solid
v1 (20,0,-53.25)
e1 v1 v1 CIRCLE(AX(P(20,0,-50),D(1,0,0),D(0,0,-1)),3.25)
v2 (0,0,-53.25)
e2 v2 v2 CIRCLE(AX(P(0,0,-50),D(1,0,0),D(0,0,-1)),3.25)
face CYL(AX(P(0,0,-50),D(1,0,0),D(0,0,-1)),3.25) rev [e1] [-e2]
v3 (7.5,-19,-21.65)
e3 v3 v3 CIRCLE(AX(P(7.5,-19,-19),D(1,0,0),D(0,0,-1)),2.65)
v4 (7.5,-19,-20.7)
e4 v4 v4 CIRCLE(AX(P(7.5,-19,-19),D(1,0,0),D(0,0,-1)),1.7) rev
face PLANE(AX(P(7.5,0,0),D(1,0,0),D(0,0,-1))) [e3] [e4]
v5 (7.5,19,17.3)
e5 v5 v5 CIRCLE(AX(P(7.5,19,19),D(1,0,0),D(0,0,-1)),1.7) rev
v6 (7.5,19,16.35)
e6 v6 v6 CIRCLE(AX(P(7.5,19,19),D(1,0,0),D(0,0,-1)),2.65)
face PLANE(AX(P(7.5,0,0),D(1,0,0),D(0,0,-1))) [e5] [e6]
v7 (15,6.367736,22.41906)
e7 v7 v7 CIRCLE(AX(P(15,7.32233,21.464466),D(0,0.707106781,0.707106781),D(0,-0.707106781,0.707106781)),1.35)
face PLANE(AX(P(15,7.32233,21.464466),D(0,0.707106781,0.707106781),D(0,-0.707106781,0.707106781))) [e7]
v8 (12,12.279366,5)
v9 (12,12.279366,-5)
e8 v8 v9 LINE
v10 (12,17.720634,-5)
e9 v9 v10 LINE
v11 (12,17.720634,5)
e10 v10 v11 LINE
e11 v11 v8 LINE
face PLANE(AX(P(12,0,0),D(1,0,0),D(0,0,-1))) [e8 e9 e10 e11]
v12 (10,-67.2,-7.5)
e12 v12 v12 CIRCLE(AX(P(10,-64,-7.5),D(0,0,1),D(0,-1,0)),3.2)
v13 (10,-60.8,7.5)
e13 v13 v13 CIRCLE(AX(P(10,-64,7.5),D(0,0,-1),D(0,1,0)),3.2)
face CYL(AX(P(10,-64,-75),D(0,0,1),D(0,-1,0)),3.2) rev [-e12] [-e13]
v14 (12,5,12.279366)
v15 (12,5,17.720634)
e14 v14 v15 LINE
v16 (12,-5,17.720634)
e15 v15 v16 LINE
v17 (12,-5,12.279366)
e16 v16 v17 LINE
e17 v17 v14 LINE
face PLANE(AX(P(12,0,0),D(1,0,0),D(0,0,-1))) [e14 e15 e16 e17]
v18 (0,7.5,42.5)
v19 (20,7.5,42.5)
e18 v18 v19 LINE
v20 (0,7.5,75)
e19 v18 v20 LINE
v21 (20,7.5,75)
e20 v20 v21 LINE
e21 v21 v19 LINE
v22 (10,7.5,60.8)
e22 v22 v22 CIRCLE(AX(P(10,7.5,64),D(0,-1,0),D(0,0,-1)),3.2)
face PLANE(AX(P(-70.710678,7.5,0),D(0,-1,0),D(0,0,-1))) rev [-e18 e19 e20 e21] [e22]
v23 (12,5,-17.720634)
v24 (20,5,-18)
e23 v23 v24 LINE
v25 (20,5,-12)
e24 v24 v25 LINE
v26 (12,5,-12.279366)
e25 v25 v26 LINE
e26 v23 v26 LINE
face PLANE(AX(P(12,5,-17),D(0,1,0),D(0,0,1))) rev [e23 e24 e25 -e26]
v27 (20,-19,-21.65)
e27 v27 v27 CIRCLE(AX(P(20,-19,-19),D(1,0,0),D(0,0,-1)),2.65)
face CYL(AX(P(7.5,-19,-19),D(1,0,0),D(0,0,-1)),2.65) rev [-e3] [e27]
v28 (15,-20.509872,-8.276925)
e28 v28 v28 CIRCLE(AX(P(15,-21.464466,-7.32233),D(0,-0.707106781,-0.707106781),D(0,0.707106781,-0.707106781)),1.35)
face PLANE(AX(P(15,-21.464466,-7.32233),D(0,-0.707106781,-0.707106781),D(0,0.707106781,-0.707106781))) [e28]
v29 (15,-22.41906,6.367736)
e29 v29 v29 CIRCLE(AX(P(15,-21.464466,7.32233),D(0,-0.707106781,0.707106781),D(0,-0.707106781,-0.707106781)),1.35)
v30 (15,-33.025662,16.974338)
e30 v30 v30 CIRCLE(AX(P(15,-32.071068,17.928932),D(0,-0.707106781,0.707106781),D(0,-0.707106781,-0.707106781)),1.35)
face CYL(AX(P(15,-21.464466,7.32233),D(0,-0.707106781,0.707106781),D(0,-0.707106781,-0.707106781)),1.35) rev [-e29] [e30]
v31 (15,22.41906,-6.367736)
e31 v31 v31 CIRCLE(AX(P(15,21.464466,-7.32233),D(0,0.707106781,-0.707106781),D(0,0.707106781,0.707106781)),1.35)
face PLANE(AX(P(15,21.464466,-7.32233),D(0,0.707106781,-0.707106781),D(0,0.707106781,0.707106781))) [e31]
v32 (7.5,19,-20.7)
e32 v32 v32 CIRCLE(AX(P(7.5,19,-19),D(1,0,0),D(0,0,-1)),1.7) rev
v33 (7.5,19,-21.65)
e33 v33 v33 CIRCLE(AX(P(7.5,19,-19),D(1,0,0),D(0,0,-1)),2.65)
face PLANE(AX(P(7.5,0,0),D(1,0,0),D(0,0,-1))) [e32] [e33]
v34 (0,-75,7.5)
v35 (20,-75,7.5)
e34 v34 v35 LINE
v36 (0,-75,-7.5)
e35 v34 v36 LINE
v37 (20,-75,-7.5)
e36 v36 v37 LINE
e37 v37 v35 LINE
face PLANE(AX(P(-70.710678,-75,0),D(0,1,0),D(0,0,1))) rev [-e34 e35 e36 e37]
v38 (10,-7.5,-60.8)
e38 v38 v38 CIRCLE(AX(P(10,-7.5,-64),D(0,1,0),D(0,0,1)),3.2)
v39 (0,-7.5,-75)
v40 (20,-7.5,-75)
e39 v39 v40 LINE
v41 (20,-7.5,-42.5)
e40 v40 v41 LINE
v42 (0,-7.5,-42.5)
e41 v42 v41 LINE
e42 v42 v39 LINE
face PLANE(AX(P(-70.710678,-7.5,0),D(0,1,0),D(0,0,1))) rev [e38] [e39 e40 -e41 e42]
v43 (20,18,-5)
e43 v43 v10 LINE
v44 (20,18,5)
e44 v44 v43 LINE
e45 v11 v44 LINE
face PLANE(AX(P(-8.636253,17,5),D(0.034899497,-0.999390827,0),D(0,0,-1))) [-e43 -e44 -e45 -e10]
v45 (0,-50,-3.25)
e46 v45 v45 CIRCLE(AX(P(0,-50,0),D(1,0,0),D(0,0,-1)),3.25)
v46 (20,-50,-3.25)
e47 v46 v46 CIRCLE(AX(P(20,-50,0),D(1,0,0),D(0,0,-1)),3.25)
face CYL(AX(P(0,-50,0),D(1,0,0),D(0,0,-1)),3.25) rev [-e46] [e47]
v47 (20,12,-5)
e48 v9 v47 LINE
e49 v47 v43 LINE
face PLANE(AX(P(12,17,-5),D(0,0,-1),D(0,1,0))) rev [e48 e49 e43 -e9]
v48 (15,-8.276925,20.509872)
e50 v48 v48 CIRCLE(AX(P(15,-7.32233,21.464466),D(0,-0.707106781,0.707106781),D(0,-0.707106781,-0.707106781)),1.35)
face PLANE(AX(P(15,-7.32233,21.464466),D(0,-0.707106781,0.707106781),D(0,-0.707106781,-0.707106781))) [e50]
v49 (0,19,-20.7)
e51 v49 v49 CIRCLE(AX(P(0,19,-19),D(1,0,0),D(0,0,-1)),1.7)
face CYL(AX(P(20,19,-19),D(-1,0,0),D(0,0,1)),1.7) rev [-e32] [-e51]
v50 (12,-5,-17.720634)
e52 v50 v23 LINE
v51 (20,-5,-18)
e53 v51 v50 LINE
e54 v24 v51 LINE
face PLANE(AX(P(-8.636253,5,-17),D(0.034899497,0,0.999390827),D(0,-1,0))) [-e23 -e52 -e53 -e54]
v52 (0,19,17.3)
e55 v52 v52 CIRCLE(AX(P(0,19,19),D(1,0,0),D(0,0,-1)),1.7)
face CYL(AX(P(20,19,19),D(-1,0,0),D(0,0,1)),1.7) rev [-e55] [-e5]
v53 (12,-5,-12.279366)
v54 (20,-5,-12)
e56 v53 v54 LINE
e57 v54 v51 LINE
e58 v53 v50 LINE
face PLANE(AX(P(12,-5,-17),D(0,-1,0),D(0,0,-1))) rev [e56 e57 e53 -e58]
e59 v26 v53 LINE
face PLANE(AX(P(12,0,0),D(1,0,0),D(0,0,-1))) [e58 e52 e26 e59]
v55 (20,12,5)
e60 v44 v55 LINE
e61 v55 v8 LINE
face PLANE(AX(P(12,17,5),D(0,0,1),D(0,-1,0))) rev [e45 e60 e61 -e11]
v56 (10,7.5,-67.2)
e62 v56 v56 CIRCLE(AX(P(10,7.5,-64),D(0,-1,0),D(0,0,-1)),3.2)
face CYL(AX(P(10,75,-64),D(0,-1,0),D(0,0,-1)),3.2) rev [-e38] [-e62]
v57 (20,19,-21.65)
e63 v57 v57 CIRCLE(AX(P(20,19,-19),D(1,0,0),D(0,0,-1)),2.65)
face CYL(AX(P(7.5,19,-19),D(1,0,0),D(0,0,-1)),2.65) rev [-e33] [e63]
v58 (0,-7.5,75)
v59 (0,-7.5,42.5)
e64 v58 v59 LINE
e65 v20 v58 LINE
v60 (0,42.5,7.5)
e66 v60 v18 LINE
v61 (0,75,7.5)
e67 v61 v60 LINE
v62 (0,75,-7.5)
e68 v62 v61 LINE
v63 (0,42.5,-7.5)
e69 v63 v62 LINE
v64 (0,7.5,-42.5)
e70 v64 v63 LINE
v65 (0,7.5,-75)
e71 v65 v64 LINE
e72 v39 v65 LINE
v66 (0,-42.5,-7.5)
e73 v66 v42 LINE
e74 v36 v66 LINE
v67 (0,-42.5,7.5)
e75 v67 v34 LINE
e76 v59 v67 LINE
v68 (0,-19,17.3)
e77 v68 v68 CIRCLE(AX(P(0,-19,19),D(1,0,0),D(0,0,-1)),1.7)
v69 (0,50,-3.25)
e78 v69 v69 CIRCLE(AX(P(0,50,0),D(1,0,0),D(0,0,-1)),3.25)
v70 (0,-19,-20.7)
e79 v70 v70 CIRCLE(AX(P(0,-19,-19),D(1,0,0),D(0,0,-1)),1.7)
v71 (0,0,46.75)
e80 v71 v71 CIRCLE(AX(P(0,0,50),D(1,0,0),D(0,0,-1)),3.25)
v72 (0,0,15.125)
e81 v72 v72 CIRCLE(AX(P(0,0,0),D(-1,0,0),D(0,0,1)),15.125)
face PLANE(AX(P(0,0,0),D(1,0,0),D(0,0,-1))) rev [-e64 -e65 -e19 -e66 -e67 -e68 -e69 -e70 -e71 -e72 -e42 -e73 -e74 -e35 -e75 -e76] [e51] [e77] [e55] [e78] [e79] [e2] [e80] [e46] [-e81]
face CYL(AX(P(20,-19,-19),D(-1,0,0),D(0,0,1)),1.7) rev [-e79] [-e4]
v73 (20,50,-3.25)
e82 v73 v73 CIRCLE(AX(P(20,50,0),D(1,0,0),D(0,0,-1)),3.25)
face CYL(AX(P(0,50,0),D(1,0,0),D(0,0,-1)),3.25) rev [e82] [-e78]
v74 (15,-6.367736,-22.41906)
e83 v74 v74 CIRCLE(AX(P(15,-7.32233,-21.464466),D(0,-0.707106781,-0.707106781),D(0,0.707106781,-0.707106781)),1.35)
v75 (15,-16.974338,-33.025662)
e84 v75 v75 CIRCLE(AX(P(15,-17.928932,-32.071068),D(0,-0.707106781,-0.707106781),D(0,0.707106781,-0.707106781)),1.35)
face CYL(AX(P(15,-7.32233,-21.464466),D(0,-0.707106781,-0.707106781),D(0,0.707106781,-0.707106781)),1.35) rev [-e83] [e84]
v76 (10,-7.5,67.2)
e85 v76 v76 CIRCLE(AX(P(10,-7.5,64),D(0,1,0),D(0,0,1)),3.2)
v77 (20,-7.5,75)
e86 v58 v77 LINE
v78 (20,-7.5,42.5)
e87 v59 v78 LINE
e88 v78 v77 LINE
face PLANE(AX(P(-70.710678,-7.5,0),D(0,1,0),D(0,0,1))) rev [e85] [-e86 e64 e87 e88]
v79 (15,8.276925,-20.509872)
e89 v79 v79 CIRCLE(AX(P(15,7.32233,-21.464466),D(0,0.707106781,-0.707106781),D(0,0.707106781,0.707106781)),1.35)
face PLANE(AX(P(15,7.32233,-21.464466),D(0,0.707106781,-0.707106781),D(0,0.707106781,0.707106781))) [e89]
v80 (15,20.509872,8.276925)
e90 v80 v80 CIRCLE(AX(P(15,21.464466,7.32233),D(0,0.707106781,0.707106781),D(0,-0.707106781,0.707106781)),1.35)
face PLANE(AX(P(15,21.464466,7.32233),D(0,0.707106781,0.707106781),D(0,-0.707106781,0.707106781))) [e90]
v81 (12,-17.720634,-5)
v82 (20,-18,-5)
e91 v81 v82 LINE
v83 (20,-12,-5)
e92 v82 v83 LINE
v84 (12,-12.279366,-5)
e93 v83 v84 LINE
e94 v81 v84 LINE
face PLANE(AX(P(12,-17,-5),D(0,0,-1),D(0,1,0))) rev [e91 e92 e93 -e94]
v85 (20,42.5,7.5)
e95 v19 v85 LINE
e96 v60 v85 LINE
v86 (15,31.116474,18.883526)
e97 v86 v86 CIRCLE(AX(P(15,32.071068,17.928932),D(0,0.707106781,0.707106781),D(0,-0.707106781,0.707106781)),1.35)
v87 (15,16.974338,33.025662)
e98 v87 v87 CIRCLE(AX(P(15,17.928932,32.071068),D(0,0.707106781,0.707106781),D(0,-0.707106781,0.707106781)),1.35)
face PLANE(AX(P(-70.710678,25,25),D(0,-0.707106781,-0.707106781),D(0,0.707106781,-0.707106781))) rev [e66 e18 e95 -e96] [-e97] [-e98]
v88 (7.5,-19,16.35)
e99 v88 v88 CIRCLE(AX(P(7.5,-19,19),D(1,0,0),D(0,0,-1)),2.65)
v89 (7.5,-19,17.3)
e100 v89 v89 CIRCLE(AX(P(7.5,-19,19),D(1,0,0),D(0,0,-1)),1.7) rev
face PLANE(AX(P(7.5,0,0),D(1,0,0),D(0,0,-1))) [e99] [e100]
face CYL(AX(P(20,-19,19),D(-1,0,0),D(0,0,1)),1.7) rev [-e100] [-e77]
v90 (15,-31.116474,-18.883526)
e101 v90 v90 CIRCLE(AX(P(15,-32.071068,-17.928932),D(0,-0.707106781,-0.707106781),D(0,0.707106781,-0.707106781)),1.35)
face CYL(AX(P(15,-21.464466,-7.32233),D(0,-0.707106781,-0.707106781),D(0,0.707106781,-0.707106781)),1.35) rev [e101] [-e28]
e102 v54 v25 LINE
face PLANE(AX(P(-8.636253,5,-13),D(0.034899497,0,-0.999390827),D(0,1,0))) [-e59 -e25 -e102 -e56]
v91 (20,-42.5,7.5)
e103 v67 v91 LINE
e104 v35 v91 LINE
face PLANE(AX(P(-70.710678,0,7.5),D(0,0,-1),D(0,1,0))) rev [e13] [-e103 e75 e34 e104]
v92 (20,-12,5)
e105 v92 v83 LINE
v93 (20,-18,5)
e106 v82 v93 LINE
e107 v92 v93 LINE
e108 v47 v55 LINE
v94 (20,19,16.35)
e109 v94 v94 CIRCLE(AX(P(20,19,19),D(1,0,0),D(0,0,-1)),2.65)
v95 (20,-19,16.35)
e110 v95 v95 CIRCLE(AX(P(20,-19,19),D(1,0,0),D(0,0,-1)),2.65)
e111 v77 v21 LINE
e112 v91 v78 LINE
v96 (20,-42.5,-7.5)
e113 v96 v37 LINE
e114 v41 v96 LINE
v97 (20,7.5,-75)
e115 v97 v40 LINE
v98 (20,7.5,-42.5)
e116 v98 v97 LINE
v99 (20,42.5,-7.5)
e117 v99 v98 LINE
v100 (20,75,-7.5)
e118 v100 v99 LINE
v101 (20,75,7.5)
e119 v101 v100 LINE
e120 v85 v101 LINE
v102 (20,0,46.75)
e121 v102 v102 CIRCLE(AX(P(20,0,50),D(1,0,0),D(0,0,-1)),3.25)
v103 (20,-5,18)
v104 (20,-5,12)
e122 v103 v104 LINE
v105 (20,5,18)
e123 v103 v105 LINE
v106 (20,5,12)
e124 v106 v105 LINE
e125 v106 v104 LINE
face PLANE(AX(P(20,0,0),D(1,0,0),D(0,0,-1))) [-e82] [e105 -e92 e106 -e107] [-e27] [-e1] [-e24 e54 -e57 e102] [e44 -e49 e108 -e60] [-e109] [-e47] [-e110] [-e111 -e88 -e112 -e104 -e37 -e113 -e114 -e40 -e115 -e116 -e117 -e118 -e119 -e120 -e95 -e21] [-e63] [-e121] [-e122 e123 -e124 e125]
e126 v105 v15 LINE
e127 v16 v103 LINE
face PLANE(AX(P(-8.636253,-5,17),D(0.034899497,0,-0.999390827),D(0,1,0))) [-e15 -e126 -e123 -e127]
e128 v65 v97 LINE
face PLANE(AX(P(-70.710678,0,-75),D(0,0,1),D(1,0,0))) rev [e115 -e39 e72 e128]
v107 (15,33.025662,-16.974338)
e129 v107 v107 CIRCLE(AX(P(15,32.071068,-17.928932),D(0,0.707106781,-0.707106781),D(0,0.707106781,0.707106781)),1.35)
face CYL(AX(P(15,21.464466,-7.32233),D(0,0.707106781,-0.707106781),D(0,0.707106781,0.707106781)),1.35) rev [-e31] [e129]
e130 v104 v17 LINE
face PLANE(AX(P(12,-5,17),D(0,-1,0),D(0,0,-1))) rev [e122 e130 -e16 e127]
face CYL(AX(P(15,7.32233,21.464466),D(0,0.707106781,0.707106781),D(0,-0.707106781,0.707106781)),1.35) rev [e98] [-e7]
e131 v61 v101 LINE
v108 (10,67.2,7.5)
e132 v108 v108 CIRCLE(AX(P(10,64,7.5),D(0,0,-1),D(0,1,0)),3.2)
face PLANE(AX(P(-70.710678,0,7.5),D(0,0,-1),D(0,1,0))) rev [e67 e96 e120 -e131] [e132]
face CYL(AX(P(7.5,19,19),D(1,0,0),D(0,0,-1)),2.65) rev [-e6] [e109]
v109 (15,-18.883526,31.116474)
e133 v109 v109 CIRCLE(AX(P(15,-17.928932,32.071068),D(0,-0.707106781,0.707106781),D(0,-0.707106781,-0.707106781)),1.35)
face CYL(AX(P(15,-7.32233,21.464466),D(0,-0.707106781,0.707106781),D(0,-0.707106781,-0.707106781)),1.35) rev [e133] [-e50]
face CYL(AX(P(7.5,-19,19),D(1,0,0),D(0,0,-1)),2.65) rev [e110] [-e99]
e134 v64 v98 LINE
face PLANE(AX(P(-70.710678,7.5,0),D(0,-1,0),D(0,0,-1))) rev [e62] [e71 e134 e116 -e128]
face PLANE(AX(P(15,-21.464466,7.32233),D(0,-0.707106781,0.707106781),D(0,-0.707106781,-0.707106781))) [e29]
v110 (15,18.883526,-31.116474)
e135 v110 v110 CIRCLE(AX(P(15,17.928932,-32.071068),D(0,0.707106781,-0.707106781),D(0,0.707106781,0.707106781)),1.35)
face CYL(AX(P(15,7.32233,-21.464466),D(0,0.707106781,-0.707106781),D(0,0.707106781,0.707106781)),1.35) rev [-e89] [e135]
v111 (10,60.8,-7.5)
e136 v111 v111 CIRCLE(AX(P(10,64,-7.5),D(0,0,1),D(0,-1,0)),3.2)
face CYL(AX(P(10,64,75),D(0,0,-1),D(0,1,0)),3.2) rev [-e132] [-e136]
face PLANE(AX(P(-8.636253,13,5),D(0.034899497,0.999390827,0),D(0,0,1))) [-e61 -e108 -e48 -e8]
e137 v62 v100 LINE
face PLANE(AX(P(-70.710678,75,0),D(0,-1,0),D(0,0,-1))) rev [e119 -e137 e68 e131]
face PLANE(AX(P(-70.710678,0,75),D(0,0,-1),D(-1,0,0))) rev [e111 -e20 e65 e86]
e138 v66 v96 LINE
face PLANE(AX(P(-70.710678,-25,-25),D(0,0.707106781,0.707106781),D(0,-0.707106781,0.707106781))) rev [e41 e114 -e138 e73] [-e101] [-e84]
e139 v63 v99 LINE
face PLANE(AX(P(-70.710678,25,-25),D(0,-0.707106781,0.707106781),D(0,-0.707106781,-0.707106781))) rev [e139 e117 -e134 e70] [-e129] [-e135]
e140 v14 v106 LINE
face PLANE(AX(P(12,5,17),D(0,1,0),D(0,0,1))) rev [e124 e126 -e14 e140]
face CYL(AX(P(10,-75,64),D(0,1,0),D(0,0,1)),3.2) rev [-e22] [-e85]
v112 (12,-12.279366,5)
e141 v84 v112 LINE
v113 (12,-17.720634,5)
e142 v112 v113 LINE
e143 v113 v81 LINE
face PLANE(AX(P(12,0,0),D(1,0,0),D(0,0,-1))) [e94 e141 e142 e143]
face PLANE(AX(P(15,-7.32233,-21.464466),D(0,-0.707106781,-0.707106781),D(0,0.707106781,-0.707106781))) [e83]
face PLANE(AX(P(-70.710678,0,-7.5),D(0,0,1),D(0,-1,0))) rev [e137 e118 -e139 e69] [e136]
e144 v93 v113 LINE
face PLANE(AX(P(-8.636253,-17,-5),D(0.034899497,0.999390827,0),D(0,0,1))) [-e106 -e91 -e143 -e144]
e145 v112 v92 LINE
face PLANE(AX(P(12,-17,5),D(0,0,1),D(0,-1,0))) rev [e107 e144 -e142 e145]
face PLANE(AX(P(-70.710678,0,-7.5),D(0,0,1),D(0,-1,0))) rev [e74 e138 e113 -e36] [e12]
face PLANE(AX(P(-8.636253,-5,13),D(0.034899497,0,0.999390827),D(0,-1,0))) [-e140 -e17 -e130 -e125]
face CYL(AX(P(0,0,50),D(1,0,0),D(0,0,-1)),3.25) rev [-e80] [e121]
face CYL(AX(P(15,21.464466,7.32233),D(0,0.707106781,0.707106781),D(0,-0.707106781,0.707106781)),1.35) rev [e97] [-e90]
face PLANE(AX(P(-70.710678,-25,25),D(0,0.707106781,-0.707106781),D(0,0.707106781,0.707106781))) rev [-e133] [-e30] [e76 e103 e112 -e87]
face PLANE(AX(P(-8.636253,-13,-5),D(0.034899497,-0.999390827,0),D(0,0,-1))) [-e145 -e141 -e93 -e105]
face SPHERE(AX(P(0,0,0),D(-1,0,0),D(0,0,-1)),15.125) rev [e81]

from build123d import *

# Parameters (mm, degrees)
SKETCH1_W               = 50
SKETCH1_H               = 50
SKETCH1_R               = 1.7
BOSS_EXTRUDE1_DEPTH     = 20
CUT_EXTRUDE1_START      = -12.5
SKETCH2_R               = 2.65
SKETCH2_R_2             = 1.7
CUT_EXTRUDE1_DEPTH      = 12.5
BOSS_EXTRUDE3_DEPTH     = 20
SKETCH5_W               = 4
SKETCH5_H               = 10
SKETCH5_W_2             = 10
SKETCH5_H_2             = 4
CUT_EXTRUDE2_DEPTH      = 8
CHAMFER1_START          = -5
CHAMFER1_DEPTH          = 10
CHAMFER1_START_2        = -17.720633844
CHAMFER1_2_OUTLINE_W    = 8
CHAMFER1_2_OUTLINE_H    = 10
CHAMFER1_2_DEPTH        = 5.441267688
CHAMFER1_START_3        = 12.279366156
CHAMFER1_3_OUTLINE_W    = 8
CHAMFER1_3_OUTLINE_H    = 10
CHAMFER1_3_DEPTH        = 5.441267688
CHAMFER1_4_DEPTH        = 10
CUT_EXTRUDE4_DEPTH      = 108.935165725
CUT_EXTRUDE4_DEPTH_BACK = 108.935165725
SKETCH7_R               = 3.25
SKETCH8_R               = 3.2
CUT_EXTRUDE5_DEPTH      = 114.275107592
CIRPATTERN1_COUNT       = 4
SKETCH9_R               = 1.35
CUT_EXTRUDE6_DEPTH      = 15
CIRPATTERN2_COUNT       = 4


with BuildPart() as part:
    # Sketch1 → Boss-Extrude1 (new body)
    with BuildSketch(Plane(origin=(0, 0, 0), x_dir=(0, 0, -1), z_dir=(1, 0, 0))):
        Rectangle(SKETCH1_W, SKETCH1_H)
        with Locations((-19, 19)):
            Circle(SKETCH1_R, mode=Mode.SUBTRACT)
        with Locations((19, 19)):
            Circle(SKETCH1_R, mode=Mode.SUBTRACT)
        with Locations((19, -19)):
            Circle(SKETCH1_R, mode=Mode.SUBTRACT)
        with Locations((-19, -19)):
            Circle(SKETCH1_R, mode=Mode.SUBTRACT)
    extrude(amount=BOSS_EXTRUDE1_DEPTH)

    # Sketch2 → Cut-Extrude1 (cut)
    # profile 1 of 4: a face of its own
    with BuildSketch(Plane(origin=(20, 0, 0), x_dir=(0, 0, -1), z_dir=(1, 0, 0)).offset(CUT_EXTRUDE1_START)):
        with Locations((-19, 19)):
            Circle(SKETCH2_R)
        with Locations((-19, 19)):
            Circle(SKETCH2_R_2, mode=Mode.SUBTRACT)
    # profile 2 of 4: a face of its own
    with BuildSketch(Plane(origin=(20, 0, 0), x_dir=(0, 0, -1), z_dir=(1, 0, 0)).offset(CUT_EXTRUDE1_START)):
        with Locations((19, 19)):
            Circle(SKETCH2_R)
        with Locations((19, 19)):
            Circle(SKETCH2_R_2, mode=Mode.SUBTRACT)
    # profile 3 of 4: a face of its own
    with BuildSketch(Plane(origin=(20, 0, 0), x_dir=(0, 0, -1), z_dir=(1, 0, 0)).offset(CUT_EXTRUDE1_START)):
        with Locations((19, -19)):
            Circle(SKETCH2_R)
        with Locations((19, -19)):
            Circle(SKETCH2_R_2, mode=Mode.SUBTRACT)
    # profile 4 of 4: a face of its own
    with BuildSketch(Plane(origin=(20, 0, 0), x_dir=(0, 0, -1), z_dir=(1, 0, 0)).offset(CUT_EXTRUDE1_START)):
        with Locations((-19, -19)):
            Circle(SKETCH2_R)
        with Locations((-19, -19)):
            Circle(SKETCH2_R_2, mode=Mode.SUBTRACT)
    extrude(amount=CUT_EXTRUDE1_DEPTH, mode=Mode.SUBTRACT)

    # Sketch3 → Cut-Revolve1 (revolve, cut)
    with BuildSketch(Plane(origin=(0, 0, 0), x_dir=(1, 0, 0), z_dir=(0, 1, 0))):
        with BuildLine():
            Line((0, 0), (0, 15.125))
            ThreePointArc((0, 15.125), (10.694990065, 10.694990065), (15.125, 0))
            Line((15.125, 0), (0, 0))
        make_face()
    revolve(axis=Axis((-993.762626263, 0, 0), (1, 0, 0)), mode=Mode.SUBTRACT)

    # Sketch4 → Boss-Extrude3 (add)
    with BuildSketch(Plane(origin=(20, 0, 0), x_dir=(0, 0, -1), z_dir=(1, 0, 0))):
        Polygon((42.5, 7.5), (25, 25), (25, -25), (42.5, -7.5), (75, -7.5), (75, 7.5), align=None)
        Polygon((-25, 25), (25, 25), (7.5, 42.5), (7.5, 75), (-7.5, 75), (-7.5, 42.5), align=None)
        Polygon((7.5, -42.5), (25, -25), (-25, -25), (-7.5, -42.5), (-7.5, -75), (7.5, -75), align=None)
        Polygon((-25, -25), (-25, 25), (-42.5, 7.5), (-75, 7.5), (-75, -7.5), (-42.5, -7.5), align=None)
    extrude(amount=-BOSS_EXTRUDE3_DEPTH)

    # Sketch5 → Cut-Extrude2 (cut)
    with BuildSketch(Plane(origin=(20, 0, 0), x_dir=(0, 0, -1), z_dir=(1, 0, 0))):
        with Locations((15, 0)):
            Rectangle(SKETCH5_W, SKETCH5_H)
        with Locations((0, 15)):
            Rectangle(SKETCH5_W_2, SKETCH5_H_2)
        with Locations((0, -15)):
            Rectangle(SKETCH5_W_2, SKETCH5_H_2)
        with Locations((-15, 0)):
            Rectangle(SKETCH5_W, SKETCH5_H)
    extrude(amount=-CUT_EXTRUDE2_DEPTH, mode=Mode.SUBTRACT)

    # Chamfer1: read off the stored shape, not the designer's step
    # Chamfer1 outline → Chamfer1 (cut)
    with BuildSketch(Plane(origin=(0, 0, 0), x_dir=(1, 0, 0), z_dir=(0, 1, 0)).offset(CHAMFER1_START)):
        Polygon((12, 12.279366156), (20, 12), (20, 13), (12, 13), align=None)
        Polygon((12, -17), (12, -17.720633844), (20, -18), (20, -17), align=None)
        Polygon((12, -12.279366156), (12, -13), (20, -13), (20, -12), align=None)
        Polygon((12, 17), (20, 17), (20, 18), (12, 17.720633844), align=None)
    extrude(amount=CHAMFER1_DEPTH, mode=Mode.SUBTRACT)

    # Chamfer1 2 outline → Chamfer1 2 (cut)
    with BuildSketch(Plane(origin=(0, 0, 0), x_dir=(1, 0, 0), z_dir=(0, 1, 0)).offset(CHAMFER1_START_2)):
        with Locations((16, 0)):
            Rectangle(CHAMFER1_2_OUTLINE_W, CHAMFER1_2_OUTLINE_H)
    extrude(amount=CHAMFER1_2_DEPTH, mode=Mode.SUBTRACT)

    # Chamfer1 3 outline → Chamfer1 3 (cut)
    with BuildSketch(Plane(origin=(0, 0, 0), x_dir=(1, 0, 0), z_dir=(0, 1, 0)).offset(CHAMFER1_START_3)):
        with Locations((16, 0)):
            Rectangle(CHAMFER1_3_OUTLINE_W, CHAMFER1_3_OUTLINE_H)
    extrude(amount=CHAMFER1_3_DEPTH, mode=Mode.SUBTRACT)

    # Chamfer1 4 outline → Chamfer1 4 (cut)
    with BuildSketch(Plane.XY.offset(CHAMFER1_START)):
        Polygon((12, 17.720633844), (20, 17.720633844), (20, 18), align=None)
        Polygon((12, 12.279366156), (20, 12), (20, 12.279366156), align=None)
        Polygon((20, -18), (20, -17.720633844), (12, -17.720633844), align=None)
        Polygon((20, -12), (12, -12.279366156), (20, -12.279366156), align=None)
    extrude(amount=CHAMFER1_4_DEPTH, mode=Mode.SUBTRACT)

    # Sketch7 → Cut-Extrude4 (cut, two sides: drawn at the far end of the back side and taken through both)
    with BuildSketch(Plane(origin=(20, 0, 0), x_dir=(0, 0, -1), z_dir=(1, 0, 0)).offset(-CUT_EXTRUDE4_DEPTH_BACK)):
        with Locations((50, 0)):
            Circle(SKETCH7_R)
        with Locations((0, -50)):
            Circle(SKETCH7_R)
        with Locations((-50, 0)):
            Circle(SKETCH7_R)
        with Locations((0, 50)):
            Circle(SKETCH7_R)
    extrude(amount=CUT_EXTRUDE4_DEPTH + CUT_EXTRUDE4_DEPTH_BACK, mode=Mode.SUBTRACT)

    # Sketch8 → Cut-Extrude5 (cut, symmetric)
    with BuildSketch(Plane.XZ.offset(7.5)):
        with Locations(Location((10, -64, 0), (0, 0, 270))):
            Circle(SKETCH8_R)
    cut_extrude5 = extrude(amount=CUT_EXTRUDE5_DEPTH, both=True, mode=Mode.SUBTRACT)

    # CirPattern1: Cut-Extrude5 ×4 about axis
    cirpattern1_axis = Axis((20, 0, 0), (1, 0, 0))
    for i in range(1, CIRPATTERN1_COUNT):
        add(cut_extrude5.rotate(cirpattern1_axis, i * 360 / CIRPATTERN1_COUNT), mode=Mode.SUBTRACT)

    # Sketch9 → Cut-Extrude6 (cut)
    with BuildSketch(Plane(origin=(0, -25, -25), x_dir=(1, 0, 0), z_dir=(0, -0.7071067811865438, -0.7071067811865513))):
        with Locations(Location((15, 10, 0), (0, 0, 270))):
            Circle(SKETCH9_R)
        with Locations(Location((15, -10, 0), (0, 0, 270))):
            Circle(SKETCH9_R)
    cut_extrude6 = extrude(amount=-CUT_EXTRUDE6_DEPTH, mode=Mode.SUBTRACT)

    # CirPattern2: Cut-Extrude6 ×4 about axis
    cirpattern2_axis = Axis((0, 0, 0), (1, 0, 0))
    for i in range(1, CIRPATTERN2_COUNT):
        add(cut_extrude6.rotate(cirpattern2_axis, i * 360 / CIRPATTERN2_COUNT), mode=Mode.SUBTRACT)


solid = part.part
